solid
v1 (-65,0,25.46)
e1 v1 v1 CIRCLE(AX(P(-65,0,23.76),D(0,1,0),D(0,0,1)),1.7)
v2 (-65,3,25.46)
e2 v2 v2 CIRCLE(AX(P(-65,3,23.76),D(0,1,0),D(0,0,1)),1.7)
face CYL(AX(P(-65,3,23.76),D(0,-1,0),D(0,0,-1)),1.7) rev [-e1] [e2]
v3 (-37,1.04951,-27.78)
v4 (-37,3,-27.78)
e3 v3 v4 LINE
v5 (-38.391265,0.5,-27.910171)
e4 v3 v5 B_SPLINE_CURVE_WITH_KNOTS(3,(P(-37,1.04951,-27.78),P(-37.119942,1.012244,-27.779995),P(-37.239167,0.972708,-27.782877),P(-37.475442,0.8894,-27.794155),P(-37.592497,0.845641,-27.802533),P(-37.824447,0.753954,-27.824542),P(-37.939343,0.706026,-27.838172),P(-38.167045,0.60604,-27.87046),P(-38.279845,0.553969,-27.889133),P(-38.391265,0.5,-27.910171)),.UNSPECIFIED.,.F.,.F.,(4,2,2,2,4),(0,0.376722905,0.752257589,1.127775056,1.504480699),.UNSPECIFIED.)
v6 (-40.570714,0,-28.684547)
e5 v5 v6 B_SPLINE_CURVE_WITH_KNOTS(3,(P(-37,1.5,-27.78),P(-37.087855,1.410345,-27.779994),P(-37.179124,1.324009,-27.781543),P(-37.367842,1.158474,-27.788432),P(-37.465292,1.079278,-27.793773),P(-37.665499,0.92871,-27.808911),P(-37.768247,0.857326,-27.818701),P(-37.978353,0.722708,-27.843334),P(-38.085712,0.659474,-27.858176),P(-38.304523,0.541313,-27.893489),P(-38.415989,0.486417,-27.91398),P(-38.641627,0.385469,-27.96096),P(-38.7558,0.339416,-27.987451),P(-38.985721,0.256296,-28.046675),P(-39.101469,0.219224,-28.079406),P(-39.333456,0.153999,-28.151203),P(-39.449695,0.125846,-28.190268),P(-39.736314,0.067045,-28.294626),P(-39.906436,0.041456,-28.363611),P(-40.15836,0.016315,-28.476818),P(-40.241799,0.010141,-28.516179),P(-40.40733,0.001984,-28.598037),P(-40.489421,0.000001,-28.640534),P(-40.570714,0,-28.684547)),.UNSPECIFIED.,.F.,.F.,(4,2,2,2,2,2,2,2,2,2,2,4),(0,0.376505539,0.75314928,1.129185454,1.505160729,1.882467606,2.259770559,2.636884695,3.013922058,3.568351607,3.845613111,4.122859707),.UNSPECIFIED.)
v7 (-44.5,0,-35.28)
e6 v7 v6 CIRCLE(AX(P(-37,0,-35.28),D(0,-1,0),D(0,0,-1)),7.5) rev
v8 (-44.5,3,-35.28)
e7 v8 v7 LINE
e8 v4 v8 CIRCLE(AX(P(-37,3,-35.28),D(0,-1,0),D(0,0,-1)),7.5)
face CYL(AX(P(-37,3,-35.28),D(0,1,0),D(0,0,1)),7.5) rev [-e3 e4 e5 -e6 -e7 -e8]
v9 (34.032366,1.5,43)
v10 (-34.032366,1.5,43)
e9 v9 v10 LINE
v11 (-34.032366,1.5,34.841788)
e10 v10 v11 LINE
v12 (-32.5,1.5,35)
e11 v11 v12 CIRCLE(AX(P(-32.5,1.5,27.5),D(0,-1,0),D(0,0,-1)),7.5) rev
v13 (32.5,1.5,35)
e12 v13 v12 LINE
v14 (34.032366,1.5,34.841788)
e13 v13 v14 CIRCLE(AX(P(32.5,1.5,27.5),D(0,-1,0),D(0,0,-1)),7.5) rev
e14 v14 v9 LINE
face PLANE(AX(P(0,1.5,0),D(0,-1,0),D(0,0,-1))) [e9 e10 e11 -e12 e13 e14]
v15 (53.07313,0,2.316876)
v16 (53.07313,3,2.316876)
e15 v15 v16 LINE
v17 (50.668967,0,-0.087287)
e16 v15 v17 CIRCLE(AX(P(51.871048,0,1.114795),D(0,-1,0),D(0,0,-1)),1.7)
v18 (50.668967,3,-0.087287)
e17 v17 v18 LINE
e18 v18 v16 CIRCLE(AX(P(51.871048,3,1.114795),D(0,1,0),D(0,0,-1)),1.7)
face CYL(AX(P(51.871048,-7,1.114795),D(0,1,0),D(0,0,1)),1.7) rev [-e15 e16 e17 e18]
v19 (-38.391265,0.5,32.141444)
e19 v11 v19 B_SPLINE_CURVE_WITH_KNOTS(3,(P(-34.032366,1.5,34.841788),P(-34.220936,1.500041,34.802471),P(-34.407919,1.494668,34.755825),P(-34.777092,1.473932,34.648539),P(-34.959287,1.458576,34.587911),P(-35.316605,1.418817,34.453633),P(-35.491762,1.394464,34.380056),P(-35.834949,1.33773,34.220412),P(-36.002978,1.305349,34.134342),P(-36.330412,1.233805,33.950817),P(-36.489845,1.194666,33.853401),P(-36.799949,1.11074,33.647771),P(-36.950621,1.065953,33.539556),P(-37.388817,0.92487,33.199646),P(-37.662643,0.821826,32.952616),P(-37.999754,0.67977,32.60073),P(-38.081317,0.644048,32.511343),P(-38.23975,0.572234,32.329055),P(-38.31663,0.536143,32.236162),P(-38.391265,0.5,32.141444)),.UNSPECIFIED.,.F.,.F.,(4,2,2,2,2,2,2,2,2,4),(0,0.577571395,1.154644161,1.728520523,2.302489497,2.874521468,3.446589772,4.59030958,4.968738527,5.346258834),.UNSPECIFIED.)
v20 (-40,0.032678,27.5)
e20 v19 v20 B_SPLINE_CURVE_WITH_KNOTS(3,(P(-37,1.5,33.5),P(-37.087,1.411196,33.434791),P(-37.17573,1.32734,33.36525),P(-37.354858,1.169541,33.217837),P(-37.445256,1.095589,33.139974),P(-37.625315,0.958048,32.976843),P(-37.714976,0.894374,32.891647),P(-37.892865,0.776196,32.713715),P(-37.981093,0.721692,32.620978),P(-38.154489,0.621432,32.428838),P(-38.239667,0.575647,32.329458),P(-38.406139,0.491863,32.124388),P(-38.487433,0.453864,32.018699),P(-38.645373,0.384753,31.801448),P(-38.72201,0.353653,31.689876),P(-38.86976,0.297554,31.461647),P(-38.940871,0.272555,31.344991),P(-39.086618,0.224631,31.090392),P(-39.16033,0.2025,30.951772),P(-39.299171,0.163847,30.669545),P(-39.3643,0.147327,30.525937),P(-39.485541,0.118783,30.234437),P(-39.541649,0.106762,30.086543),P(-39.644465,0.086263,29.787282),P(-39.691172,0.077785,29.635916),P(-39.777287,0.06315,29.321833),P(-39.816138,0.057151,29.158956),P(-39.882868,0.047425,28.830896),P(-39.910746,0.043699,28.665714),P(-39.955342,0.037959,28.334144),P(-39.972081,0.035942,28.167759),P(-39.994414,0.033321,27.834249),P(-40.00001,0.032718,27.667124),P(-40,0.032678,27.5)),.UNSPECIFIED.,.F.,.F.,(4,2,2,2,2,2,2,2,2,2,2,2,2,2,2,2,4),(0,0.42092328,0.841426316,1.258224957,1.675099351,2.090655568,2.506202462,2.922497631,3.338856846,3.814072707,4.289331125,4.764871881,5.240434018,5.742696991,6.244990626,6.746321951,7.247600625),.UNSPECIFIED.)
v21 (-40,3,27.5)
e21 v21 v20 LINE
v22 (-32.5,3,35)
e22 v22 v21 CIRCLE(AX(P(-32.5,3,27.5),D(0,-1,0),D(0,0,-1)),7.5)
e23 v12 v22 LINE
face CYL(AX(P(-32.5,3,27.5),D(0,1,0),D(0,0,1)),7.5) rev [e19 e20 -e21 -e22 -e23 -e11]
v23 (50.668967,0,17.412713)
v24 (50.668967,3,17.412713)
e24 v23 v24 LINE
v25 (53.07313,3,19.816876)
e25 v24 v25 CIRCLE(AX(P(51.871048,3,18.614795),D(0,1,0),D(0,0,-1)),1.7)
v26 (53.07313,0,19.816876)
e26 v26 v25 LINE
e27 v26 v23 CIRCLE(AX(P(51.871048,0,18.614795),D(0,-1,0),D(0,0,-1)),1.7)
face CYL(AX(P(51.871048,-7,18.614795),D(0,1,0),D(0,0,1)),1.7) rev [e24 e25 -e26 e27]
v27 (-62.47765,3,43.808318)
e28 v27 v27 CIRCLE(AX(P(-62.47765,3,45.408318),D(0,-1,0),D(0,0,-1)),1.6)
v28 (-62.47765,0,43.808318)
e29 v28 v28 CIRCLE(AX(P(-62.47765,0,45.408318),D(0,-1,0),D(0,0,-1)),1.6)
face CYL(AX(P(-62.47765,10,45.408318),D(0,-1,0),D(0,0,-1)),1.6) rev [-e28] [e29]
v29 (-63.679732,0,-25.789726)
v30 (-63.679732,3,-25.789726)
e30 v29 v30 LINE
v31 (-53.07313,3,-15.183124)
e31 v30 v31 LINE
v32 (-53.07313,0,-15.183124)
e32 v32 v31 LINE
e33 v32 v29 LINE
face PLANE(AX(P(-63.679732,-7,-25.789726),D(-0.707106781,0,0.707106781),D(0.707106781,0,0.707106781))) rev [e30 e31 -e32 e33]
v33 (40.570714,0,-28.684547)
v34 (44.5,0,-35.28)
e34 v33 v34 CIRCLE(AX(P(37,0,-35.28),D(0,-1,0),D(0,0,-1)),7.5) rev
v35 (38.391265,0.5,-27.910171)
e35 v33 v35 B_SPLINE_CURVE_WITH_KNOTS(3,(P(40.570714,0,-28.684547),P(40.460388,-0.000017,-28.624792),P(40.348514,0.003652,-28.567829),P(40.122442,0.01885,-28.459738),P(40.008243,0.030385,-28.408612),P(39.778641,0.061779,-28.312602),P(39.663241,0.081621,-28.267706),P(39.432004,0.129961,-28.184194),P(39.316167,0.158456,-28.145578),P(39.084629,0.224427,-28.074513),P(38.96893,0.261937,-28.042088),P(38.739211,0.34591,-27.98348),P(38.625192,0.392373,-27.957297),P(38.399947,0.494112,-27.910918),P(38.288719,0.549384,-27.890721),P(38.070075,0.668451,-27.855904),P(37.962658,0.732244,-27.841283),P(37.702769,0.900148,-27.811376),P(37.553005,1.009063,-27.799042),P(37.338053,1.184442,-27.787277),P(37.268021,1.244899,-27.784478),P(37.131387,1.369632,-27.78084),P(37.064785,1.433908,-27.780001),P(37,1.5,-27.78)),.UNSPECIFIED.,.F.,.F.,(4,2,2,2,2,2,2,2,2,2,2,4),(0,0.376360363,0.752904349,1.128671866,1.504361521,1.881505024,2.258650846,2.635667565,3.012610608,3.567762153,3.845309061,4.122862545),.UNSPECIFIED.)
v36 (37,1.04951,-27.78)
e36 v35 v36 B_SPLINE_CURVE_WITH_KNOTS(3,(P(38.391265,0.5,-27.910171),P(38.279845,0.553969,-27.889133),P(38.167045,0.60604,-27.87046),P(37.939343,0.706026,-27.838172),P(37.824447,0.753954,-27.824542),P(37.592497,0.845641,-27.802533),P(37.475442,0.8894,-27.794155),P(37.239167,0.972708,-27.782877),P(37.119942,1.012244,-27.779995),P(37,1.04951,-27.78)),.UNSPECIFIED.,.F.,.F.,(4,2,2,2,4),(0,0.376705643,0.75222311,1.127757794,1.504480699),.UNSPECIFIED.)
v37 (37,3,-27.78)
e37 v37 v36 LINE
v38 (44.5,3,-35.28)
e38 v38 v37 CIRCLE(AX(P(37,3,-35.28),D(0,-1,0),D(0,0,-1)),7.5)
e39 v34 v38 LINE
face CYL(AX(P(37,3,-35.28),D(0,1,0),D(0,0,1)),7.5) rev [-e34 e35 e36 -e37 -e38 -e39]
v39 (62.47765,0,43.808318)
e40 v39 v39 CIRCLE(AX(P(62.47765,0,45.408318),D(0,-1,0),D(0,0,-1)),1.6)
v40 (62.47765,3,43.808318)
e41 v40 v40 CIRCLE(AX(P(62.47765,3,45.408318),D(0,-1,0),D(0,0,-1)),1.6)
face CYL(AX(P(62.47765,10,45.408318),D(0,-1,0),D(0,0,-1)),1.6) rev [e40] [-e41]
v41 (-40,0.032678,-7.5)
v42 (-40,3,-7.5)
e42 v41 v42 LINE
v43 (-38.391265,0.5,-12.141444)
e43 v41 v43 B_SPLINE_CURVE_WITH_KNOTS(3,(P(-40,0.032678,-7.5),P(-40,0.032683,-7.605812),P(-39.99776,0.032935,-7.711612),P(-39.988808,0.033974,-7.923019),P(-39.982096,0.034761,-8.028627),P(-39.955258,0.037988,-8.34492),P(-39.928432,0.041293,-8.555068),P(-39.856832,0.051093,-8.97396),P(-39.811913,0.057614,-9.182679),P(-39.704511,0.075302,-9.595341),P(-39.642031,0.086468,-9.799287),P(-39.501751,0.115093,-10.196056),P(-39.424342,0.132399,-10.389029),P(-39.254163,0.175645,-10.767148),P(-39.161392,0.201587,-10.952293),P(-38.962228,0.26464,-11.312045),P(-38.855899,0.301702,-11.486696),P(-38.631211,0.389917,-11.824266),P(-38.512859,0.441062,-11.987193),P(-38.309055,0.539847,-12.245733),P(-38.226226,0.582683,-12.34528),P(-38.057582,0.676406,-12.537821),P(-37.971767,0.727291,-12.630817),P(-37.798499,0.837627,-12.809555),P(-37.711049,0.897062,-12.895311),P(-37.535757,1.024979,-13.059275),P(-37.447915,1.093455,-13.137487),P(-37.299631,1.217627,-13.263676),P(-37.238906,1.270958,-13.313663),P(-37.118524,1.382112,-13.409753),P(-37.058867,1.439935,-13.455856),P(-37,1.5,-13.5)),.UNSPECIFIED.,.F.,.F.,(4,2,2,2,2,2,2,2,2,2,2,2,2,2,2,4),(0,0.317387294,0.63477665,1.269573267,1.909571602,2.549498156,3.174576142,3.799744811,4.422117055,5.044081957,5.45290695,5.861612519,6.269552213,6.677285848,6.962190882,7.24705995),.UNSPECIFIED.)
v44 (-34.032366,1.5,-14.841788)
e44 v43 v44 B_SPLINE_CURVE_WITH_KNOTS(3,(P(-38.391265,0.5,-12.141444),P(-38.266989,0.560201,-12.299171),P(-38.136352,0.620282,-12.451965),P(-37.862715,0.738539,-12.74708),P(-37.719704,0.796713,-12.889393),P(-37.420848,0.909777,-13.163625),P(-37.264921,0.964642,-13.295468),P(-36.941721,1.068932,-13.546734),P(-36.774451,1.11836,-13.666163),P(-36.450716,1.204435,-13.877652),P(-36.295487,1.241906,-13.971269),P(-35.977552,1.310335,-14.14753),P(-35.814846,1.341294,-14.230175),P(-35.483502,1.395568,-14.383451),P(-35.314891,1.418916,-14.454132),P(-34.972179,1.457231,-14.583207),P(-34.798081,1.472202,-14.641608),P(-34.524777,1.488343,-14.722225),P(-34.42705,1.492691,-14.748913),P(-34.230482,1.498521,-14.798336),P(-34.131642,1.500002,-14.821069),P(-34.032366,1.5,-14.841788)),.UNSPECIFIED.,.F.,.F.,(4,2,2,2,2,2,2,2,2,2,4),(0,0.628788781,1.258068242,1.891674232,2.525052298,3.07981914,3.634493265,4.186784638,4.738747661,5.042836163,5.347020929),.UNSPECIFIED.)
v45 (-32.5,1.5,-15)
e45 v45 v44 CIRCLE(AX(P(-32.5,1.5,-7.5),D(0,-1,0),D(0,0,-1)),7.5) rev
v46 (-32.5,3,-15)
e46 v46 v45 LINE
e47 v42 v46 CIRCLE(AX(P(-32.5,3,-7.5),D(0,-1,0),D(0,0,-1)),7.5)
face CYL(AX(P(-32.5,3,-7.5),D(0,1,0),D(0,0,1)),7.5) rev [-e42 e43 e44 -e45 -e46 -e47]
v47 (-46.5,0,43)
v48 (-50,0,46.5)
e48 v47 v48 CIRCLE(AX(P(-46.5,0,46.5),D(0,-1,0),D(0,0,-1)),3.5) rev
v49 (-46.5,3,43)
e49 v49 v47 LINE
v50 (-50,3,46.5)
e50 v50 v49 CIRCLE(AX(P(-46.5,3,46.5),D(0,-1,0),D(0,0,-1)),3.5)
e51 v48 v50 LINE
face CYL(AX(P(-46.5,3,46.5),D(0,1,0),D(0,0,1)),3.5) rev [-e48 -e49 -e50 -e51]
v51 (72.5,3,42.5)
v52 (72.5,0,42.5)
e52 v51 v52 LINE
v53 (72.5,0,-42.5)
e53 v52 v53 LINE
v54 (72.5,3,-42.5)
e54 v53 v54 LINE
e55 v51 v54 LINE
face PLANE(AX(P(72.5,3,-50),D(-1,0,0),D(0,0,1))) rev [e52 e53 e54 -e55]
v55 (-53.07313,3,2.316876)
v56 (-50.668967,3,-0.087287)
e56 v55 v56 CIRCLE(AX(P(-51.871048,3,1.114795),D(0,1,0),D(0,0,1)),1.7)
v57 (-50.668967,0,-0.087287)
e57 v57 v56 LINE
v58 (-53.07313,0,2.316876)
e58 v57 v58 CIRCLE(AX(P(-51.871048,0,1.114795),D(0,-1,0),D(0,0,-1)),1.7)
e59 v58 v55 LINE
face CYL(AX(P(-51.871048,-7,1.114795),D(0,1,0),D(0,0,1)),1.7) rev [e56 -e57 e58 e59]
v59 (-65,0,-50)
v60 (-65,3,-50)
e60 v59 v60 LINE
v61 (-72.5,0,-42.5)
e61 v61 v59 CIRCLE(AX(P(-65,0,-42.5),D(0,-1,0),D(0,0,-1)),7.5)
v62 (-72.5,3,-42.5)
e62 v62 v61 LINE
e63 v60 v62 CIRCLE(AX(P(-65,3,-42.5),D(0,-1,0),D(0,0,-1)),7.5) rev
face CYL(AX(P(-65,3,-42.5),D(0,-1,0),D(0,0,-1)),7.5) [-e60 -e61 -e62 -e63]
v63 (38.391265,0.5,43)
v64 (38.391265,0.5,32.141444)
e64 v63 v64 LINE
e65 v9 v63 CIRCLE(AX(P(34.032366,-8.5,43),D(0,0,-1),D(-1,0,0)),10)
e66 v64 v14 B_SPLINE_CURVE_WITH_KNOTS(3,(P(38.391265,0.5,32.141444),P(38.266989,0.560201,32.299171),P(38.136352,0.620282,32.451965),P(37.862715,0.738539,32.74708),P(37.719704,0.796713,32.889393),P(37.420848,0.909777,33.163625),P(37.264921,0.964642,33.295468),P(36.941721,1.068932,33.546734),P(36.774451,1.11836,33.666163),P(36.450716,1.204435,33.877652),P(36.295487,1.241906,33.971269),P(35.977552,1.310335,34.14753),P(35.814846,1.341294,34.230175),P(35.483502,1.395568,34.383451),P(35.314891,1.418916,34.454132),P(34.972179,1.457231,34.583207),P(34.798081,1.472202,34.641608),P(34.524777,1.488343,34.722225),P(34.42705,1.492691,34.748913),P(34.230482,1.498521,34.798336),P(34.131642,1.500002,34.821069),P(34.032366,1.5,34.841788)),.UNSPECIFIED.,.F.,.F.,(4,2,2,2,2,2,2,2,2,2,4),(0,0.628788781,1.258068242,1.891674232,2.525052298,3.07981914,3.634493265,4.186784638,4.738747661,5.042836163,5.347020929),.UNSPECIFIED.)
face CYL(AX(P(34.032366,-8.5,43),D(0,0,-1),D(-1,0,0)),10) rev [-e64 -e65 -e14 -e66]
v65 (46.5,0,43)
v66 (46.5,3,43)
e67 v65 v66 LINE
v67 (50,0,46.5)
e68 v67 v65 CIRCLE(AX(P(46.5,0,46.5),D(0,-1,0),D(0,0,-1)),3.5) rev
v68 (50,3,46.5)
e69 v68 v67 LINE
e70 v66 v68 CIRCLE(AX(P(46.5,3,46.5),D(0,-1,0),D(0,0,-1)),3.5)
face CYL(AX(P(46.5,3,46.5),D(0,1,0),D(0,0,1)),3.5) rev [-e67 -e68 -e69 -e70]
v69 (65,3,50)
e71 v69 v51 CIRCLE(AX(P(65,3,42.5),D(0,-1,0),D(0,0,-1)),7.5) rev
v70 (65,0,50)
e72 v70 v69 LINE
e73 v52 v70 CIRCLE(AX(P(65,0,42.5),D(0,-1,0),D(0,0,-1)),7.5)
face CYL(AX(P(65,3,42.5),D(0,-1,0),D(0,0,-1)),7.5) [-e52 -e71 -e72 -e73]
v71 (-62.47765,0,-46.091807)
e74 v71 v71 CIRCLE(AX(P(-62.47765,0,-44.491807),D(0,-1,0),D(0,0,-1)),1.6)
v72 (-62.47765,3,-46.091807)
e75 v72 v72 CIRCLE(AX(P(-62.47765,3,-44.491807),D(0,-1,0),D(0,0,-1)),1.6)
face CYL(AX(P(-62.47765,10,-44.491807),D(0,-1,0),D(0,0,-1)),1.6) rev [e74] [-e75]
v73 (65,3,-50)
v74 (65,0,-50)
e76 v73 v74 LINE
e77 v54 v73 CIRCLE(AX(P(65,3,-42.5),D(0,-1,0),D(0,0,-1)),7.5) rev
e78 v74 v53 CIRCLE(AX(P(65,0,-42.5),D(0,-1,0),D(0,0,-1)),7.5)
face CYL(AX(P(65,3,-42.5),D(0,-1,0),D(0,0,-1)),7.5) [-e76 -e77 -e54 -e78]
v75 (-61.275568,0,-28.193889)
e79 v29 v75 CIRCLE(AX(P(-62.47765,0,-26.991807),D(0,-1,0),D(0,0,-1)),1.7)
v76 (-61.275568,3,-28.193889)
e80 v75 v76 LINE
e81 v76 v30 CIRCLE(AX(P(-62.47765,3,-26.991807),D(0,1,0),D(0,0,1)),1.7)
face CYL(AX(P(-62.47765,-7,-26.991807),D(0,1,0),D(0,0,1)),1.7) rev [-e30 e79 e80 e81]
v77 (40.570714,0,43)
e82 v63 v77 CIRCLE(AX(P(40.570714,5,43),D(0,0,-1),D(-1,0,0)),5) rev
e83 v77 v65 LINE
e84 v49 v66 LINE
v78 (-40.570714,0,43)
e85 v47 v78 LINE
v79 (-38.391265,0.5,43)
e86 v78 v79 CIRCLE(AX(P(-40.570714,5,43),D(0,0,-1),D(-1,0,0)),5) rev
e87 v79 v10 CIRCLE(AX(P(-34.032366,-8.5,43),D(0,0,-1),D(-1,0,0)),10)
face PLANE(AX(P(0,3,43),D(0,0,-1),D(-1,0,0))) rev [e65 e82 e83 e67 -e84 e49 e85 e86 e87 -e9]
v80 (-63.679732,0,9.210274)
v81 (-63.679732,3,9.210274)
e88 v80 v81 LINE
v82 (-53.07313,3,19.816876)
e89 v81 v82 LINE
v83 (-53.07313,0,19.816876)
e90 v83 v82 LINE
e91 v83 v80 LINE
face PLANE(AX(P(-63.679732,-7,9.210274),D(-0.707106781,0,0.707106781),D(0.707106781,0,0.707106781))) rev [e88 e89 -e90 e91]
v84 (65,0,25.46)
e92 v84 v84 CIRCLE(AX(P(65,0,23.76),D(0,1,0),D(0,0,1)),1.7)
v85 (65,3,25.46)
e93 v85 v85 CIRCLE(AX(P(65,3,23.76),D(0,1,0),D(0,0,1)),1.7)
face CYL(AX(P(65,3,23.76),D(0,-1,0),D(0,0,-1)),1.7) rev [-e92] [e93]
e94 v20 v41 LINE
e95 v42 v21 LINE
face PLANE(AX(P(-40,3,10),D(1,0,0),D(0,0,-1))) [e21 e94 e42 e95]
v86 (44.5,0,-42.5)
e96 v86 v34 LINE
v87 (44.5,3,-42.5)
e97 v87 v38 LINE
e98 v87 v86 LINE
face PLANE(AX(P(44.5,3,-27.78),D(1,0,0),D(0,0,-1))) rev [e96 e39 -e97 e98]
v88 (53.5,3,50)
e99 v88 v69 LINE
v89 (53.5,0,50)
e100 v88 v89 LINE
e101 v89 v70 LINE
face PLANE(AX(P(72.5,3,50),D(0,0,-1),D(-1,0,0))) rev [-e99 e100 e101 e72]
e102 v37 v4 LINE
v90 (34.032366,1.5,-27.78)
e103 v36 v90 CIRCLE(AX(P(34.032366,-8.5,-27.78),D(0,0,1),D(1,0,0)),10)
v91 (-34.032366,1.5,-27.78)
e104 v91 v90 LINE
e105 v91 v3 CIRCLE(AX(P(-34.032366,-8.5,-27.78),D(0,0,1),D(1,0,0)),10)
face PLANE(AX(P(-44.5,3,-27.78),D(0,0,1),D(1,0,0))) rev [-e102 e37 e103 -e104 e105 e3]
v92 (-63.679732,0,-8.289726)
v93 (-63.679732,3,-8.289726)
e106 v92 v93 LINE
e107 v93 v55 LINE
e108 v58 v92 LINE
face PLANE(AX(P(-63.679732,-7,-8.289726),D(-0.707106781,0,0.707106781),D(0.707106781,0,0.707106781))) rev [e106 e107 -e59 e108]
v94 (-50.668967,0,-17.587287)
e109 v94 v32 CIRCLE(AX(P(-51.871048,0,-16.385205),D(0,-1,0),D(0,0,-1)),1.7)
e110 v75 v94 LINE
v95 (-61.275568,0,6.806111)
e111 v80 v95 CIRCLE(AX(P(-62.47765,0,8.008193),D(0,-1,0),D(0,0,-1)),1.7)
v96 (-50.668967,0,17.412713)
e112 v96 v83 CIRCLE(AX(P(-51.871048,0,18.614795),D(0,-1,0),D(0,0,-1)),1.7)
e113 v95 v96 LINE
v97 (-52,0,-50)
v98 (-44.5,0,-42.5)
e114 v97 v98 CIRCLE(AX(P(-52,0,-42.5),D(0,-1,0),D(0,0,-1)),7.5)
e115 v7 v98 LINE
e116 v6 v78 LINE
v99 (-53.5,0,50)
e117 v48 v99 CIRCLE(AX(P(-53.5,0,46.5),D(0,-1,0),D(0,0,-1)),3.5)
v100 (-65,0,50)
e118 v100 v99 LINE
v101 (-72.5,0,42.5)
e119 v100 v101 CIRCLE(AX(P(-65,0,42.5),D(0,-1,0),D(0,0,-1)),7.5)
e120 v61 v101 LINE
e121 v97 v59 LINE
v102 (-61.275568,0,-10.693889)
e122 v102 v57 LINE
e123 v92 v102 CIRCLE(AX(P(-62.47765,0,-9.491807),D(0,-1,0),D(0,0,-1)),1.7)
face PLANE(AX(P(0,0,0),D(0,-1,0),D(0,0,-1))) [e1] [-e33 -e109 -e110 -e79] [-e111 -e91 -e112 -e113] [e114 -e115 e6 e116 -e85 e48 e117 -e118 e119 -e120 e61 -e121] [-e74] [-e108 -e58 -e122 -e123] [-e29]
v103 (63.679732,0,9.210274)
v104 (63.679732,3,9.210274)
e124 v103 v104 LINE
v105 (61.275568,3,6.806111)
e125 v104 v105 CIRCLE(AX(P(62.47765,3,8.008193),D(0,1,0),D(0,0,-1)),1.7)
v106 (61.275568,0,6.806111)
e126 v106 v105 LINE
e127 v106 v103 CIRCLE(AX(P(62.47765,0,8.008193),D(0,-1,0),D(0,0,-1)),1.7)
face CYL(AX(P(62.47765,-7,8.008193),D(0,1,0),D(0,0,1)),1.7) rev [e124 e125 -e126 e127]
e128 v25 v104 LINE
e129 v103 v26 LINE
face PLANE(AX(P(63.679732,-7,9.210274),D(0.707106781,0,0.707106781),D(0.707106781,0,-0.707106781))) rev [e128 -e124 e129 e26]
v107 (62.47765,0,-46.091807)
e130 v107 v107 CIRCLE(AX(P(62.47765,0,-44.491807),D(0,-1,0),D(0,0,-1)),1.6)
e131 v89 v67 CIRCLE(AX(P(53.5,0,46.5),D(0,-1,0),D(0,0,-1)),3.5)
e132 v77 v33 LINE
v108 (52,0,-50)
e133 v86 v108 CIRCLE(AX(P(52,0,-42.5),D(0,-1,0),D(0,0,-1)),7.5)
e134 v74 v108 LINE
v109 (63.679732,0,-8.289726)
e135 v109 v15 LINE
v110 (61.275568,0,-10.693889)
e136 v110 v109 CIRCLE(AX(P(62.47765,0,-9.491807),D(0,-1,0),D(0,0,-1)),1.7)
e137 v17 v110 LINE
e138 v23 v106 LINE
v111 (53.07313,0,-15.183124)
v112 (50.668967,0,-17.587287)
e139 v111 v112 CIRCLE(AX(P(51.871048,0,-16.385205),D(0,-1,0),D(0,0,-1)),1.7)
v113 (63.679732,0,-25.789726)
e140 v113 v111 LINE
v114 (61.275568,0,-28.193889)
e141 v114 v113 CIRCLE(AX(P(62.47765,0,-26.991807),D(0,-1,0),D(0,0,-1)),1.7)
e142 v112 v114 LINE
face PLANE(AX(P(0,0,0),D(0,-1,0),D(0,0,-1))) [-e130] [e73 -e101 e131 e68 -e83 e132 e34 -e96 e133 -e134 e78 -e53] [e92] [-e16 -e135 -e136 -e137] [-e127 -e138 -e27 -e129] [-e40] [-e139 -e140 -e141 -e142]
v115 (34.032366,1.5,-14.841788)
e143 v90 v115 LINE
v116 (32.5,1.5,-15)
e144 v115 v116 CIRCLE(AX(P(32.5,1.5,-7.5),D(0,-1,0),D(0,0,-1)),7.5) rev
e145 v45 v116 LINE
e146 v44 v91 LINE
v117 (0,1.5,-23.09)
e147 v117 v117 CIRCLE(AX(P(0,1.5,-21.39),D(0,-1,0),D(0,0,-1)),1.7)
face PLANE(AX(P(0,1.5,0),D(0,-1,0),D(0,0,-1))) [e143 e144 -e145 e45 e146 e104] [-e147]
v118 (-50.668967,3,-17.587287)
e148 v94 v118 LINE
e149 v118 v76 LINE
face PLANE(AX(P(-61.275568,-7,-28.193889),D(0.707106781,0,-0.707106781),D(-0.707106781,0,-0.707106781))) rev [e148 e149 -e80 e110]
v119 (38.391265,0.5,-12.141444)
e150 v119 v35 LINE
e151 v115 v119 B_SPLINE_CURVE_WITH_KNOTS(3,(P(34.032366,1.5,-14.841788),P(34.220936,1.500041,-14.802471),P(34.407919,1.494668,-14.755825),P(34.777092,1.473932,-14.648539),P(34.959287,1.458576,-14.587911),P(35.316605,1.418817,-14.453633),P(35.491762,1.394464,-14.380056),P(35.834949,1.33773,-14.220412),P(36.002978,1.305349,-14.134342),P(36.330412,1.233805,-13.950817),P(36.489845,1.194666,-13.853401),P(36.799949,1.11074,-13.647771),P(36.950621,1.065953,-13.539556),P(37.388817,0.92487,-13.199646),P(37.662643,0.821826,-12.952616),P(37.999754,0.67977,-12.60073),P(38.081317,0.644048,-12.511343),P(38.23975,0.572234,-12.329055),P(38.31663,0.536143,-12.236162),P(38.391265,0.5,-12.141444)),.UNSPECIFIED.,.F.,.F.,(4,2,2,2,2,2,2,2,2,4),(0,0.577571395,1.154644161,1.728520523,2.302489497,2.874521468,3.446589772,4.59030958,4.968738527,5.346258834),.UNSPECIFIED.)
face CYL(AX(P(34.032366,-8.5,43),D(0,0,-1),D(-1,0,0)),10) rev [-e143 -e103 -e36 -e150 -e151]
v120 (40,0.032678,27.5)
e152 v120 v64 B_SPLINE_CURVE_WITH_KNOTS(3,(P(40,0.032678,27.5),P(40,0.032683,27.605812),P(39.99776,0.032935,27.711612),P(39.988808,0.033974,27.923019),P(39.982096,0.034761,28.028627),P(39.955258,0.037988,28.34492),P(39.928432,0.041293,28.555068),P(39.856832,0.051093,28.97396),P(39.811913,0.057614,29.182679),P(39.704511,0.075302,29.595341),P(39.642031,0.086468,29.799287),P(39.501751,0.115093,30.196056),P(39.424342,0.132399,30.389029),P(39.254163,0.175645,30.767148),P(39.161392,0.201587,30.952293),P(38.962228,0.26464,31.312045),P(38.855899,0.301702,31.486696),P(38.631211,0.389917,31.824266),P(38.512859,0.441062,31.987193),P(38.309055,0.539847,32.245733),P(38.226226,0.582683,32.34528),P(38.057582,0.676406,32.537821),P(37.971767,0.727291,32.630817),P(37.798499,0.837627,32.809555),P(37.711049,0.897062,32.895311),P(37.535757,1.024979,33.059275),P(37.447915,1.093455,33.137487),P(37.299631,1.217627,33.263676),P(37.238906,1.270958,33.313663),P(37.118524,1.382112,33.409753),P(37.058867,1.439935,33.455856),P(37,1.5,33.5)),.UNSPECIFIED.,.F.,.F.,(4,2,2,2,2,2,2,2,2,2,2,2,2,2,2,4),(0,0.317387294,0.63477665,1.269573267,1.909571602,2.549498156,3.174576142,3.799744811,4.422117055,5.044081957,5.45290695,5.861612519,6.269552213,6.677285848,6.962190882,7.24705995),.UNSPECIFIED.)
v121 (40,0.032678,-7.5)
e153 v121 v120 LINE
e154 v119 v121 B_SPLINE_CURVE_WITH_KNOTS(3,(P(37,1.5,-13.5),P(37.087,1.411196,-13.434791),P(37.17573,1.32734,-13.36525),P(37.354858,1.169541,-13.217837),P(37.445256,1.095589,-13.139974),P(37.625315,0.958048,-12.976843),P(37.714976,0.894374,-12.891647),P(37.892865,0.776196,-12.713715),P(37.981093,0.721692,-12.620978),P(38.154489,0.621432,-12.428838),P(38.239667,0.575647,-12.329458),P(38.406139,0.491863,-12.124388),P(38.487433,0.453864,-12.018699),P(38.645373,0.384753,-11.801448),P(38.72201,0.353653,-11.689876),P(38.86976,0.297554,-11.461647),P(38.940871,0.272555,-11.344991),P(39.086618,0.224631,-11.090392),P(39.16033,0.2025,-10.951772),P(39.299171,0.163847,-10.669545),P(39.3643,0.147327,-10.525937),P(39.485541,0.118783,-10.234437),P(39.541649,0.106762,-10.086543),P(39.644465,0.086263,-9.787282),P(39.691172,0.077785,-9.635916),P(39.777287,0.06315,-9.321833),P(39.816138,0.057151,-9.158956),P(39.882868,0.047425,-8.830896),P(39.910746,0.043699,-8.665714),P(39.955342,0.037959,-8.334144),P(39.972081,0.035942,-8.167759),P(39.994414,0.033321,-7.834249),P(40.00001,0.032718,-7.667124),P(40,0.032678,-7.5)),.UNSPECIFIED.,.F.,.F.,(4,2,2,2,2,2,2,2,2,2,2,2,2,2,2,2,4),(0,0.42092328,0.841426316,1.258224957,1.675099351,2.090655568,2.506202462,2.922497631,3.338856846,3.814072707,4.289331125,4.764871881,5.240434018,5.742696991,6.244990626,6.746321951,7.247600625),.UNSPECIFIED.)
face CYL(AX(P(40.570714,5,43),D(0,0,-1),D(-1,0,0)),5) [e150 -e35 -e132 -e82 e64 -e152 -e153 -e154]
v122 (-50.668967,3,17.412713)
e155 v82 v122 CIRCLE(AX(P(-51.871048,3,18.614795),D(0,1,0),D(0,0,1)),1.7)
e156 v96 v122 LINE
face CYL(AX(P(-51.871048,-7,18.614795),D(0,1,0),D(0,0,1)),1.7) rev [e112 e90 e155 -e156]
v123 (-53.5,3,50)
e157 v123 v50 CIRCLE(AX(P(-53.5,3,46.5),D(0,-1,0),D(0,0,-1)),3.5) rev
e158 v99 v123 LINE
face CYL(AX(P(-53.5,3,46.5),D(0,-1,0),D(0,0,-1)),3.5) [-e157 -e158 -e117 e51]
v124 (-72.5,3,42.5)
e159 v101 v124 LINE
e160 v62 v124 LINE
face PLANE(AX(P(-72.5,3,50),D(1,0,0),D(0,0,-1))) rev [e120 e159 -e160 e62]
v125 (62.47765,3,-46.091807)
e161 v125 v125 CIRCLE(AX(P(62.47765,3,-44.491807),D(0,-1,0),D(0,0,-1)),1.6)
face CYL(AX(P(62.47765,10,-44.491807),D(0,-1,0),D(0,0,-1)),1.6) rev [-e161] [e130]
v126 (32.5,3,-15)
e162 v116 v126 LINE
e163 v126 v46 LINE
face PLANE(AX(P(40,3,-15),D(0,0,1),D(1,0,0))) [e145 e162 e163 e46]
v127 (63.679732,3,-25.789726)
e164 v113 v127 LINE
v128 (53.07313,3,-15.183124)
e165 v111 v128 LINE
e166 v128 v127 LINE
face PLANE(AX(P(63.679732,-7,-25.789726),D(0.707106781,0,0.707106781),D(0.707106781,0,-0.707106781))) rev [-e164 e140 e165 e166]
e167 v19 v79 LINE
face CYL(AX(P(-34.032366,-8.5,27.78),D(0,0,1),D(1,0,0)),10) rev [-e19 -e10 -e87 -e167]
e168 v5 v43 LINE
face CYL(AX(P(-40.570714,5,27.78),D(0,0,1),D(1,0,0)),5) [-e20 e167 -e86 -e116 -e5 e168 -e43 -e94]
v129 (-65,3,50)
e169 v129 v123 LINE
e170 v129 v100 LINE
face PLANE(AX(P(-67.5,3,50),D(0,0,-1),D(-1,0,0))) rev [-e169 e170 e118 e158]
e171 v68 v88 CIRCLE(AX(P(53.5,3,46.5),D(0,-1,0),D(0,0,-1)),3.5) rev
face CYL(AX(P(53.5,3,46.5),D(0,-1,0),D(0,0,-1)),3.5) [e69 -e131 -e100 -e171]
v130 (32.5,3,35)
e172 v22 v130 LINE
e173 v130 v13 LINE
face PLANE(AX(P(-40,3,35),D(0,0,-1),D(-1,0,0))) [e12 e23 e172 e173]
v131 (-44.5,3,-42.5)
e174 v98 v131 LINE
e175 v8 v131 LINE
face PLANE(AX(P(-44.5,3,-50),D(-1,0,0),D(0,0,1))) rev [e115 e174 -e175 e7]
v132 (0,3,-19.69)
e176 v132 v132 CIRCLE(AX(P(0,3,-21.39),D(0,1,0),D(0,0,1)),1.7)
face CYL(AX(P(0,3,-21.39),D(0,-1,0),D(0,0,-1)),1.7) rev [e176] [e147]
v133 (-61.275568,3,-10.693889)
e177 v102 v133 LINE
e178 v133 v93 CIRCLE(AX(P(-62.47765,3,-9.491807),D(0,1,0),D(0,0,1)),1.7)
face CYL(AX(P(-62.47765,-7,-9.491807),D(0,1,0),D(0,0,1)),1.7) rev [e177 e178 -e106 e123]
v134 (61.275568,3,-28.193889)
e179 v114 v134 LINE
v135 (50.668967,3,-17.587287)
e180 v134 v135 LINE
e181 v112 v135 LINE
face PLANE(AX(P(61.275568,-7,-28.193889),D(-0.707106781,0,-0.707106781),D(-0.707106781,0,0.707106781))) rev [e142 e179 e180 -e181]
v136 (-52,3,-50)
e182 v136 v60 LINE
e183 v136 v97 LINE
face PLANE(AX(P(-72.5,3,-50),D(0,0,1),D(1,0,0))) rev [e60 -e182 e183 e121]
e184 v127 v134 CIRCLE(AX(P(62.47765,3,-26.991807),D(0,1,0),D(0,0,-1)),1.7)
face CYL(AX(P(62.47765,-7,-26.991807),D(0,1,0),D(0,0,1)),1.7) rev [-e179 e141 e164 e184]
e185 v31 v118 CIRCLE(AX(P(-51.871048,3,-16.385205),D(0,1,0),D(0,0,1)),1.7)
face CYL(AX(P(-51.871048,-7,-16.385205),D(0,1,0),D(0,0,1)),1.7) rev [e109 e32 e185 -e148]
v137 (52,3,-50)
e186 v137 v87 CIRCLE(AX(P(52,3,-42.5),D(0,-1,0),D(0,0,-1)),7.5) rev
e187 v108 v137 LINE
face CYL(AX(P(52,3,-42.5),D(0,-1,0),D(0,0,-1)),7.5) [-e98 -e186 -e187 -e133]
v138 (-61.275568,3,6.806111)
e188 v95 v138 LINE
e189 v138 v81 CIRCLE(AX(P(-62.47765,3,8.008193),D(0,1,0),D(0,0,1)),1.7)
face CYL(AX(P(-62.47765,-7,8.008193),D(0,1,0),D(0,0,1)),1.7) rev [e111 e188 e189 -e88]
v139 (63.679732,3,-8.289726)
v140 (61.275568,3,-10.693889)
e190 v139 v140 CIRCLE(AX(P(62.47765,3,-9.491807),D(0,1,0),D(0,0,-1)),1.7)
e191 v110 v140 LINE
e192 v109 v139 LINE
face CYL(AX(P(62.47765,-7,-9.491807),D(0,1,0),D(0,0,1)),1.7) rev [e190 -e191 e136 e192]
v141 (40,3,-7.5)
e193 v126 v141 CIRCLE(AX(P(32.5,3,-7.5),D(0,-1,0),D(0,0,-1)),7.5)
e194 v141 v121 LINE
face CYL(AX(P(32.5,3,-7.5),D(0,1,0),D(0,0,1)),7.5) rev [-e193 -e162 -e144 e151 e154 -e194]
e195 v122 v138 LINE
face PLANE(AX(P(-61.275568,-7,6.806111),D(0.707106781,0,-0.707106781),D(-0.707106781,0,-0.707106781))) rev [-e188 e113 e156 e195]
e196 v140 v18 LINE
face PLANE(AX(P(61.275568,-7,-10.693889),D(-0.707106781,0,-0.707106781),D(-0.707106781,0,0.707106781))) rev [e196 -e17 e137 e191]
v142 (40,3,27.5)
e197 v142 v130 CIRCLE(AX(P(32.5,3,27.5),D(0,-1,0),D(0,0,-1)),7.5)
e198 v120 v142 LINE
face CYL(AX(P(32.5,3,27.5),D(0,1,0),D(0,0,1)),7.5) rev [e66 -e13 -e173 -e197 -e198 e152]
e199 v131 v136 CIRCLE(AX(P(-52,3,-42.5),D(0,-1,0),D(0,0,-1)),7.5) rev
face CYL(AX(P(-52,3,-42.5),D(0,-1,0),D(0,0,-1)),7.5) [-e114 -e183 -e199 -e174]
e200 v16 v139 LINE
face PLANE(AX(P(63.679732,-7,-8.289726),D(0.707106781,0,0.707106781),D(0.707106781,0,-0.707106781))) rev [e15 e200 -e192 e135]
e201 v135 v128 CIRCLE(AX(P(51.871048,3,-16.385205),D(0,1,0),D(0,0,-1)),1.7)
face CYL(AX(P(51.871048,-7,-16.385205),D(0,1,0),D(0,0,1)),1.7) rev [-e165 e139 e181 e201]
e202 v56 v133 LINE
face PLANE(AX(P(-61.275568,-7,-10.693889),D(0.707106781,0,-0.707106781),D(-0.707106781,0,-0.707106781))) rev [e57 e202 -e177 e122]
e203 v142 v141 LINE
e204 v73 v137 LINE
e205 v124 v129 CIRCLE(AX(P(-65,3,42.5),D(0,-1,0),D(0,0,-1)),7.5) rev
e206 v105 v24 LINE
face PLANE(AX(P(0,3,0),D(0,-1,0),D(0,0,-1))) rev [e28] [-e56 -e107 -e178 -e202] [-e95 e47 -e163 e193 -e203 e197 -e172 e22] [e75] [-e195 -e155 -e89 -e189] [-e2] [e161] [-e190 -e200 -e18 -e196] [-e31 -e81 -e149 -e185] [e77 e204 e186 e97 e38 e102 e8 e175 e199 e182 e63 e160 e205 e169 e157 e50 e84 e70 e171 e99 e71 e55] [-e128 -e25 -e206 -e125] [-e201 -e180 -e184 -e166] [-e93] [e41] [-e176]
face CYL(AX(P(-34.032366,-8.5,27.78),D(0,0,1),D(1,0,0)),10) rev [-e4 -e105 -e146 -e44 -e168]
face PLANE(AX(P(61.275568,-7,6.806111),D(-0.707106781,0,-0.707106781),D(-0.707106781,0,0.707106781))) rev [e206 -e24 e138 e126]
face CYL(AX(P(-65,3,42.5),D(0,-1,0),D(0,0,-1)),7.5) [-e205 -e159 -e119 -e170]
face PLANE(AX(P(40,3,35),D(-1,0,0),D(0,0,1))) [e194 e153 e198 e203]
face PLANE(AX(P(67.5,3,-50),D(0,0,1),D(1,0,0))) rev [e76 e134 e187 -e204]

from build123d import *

# Parameters (mm, degrees)
SKETCH_1_R          = 1.7
EXTRUDE_1_DEPTH     = 3
FILLET_1_R          = 7.5
FILLET_2_R          = 3.5
CUT_EXTRUDE_5_DEPTH = 10
CUT_EXTRUDE_6_DEPTH = 10
CUT_EXTRUDE_7_DEPTH = 1.5
FILLET_START        = -35.28
FILLET_3_DEPTH      = 78.28
FILLET_4_R          = 10


with BuildPart() as part:
    # 草图1 → 凸台-拉伸1 (new body)
    with BuildSketch(Plane(origin=(0, 0, 0), x_dir=(1, 0, 0), z_dir=(0, 1, 0))):
        Polygon((-67.5, 50), (-44.5, 50), (-44.5, 27.78), (44.5, 27.78), (44.5, 50), (67.5, 50), (72.5, 50), (72.5, -50), (67.5, -50), (50, -50), (50, -43), (0, -43), (-50, -43), (-50, -50), (-67.5, -50), (-72.5, -50), (-72.5, 50), align=None)
        with Locations(Location((0, 21.39, 0), (0, 0, 270))):
            Circle(SKETCH_1_R, mode=Mode.SUBTRACT)
        with Locations(Location((65, -23.76, 0), (0, 0, 270))):
            Circle(SKETCH_1_R, mode=Mode.SUBTRACT)
        with Locations(Location((-65, -23.76, 0), (0, 0, 270))):
            Circle(SKETCH_1_R, mode=Mode.SUBTRACT)
        Polygon((-40, -10), (-40, -35), (40, -35), (40, 15), (-40, 15), align=None, mode=Mode.SUBTRACT)
    extrude(amount=EXTRUDE_1_DEPTH)

    # 圆角1
    fillet_1_edges = [part.edges().sort_by_distance(p)[0] for p in [
        (72.5, 1.5, -50),
        (72.5, 1.5, 50),
        (-72.5, 1.5, 50),
        (-72.5, 1.5, -50),
        (-44.5, 1.5, -50),
        (-44.5, 1.5, -27.78),
        (44.5, 1.5, -27.78),
        (44.5, 1.5, -50),
        (-40, 1.5, -15),
        (-40, 1.5, 35),
        (40, 1.5, 35),
        (40, 1.5, -15),
    ]]
    fillet(fillet_1_edges, radius=FILLET_1_R)

    # 圆角2
    fillet_2_edges = [part.edges().sort_by_distance(p)[0] for p in [
        (50, 1.5, 43),
        (-50, 1.5, 43),
    ]]
    fillet(fillet_2_edges, radius=FILLET_2_R)
    fillet_2_2_edges = [part.edges().sort_by_distance(p)[0] for p in [
        (50, 1.5, 50),
        (-50, 1.5, 50),
    ]]
    fillet(fillet_2_2_edges, radius=FILLET_2_R - 0.0001)  # a hair under: the kernel refuses the full size

    # 草图12 → 切除-拉伸5 (cut)
    with BuildSketch(Plane(origin=(0, 0, 0), x_dir=(-1, 0, 0), z_dir=(0, -1, 0))):
        with BuildLine():
            ThreePointArc((62.47765, -43.808317961), (61.34627915, -44.276947111), (60.87765, -45.408317961))
            Line((60.87765, -45.408317961), (62.47765, -45.408317961))
            Line((62.47765, -45.408317961), (62.47765, -43.808317961))
        make_face()
        with BuildLine():
            Line((62.47765, -45.408317961), (60.87765, -45.408317961))
            ThreePointArc((60.87765, -45.408317961), (62.47765, -47.008317961), (64.07765, -45.408317961))
            ThreePointArc((64.07765, -45.408317961), (63.60902085, -44.276947111), (62.47765, -43.808317961))
            Line((62.47765, -43.808317961), (62.47765, -45.408317961))
        make_face()
        with BuildLine():
            ThreePointArc((-62.47765, -43.808317961), (-63.60902085, -46.539688811), (-60.87765, -45.408317961))
            Line((-60.87765, -45.408317961), (-62.47765, -45.408317961))
            Line((-62.47765, -45.408317961), (-62.47765, -43.808317961))
        make_face()
        with BuildLine():
            Line((-62.47765, -45.408317961), (-60.87765, -45.408317961))
            ThreePointArc((-60.87765, -45.408317961), (-61.34627915, -44.276947111), (-62.47765, -43.808317961))
            Line((-62.47765, -43.808317961), (-62.47765, -45.408317961))
        make_face()
        with BuildLine():
            ThreePointArc((-62.47765, 42.891807039), (-61.34627915, 43.360436189), (-60.87765, 44.491807039))
            Line((-60.87765, 44.491807039), (-62.47765, 44.491807039))
            Line((-62.47765, 44.491807039), (-62.47765, 42.891807039))
        make_face()
        with BuildLine():
            Line((-62.47765, 44.491807039), (-60.87765, 44.491807039))
            ThreePointArc((-60.87765, 44.491807039), (-63.60902085, 45.623177889), (-62.47765, 42.891807039))
            Line((-62.47765, 42.891807039), (-62.47765, 44.491807039))
        make_face()
        with BuildLine():
            ThreePointArc((64.07765, 44.491807039), (62.47765, 46.091807039), (60.87765, 44.491807039))
            Line((60.87765, 44.491807039), (62.47765, 44.491807039))
            Line((62.47765, 44.491807039), (62.47765, 42.891807039))
            ThreePointArc((62.47765, 42.891807039), (63.60902085, 43.360436189), (64.07765, 44.491807039))
        make_face()
        with BuildLine():
            Line((62.47765, 44.491807039), (60.87765, 44.491807039))
            ThreePointArc((60.87765, 44.491807039), (61.34627915, 43.360436189), (62.47765, 42.891807039))
            Line((62.47765, 42.891807039), (62.47765, 44.491807039))
        make_face()
    extrude(amount=-CUT_EXTRUDE_5_DEPTH, mode=Mode.SUBTRACT)

    # 草图13 → 切除-拉伸6 (cut)
    with BuildSketch(Plane(origin=(0, 3, 0), x_dir=(1, 0, 0), z_dir=(0, 1, 0))):
        with BuildLine():
            Line((61.275568472, -6.806111433), (50.668966754, -17.412713151))
            ThreePointArc((50.668966754, -17.412713151), (50.668966754, -19.816876207), (53.07312981, -19.816876207))
            Line((53.07312981, -19.816876207), (63.679731528, -9.210274489))
            ThreePointArc((63.679731528, -9.210274489), (63.679731528, -6.806111433), (61.275568472, -6.806111433))
        make_face()
        with BuildLine():
            Line((-61.275568472, 28.193888567), (-50.668966754, 17.587286849))
            ThreePointArc((-50.668966754, 17.587286849), (-50.668966754, 15.183123793), (-53.07312981, 15.183123793))
            Line((-53.07312981, 15.183123793), (-63.679731528, 25.789725511))
            ThreePointArc((-63.679731528, 25.789725511), (-63.679731528, 28.193888567), (-61.275568472, 28.193888567))
        make_face()
        with BuildLine():
            Line((-63.679731528, 8.289725511), (-53.07312981, -2.316876207))
            ThreePointArc((-53.07312981, -2.316876207), (-50.668966754, -2.316876207), (-50.668966754, 0.087286849))
            Line((-50.668966754, 0.087286849), (-61.275568472, 10.693888567))
            ThreePointArc((-61.275568472, 10.693888567), (-63.679731528, 10.693888567), (-63.679731528, 8.289725511))
        make_face()
        with BuildLine():
            Line((-63.679731528, -9.210274489), (-53.07312981, -19.816876207))
            ThreePointArc((-53.07312981, -19.816876207), (-50.668966754, -19.816876207), (-50.668966754, -17.412713151))
            Line((-50.668966754, -17.412713151), (-61.275568472, -6.806111433))
            ThreePointArc((-61.275568472, -6.806111433), (-63.679731528, -6.806111433), (-63.679731528, -9.210274489))
        make_face()
        with BuildLine():
            Line((61.275568472, 10.693888567), (50.668966754, 0.087286849))
            ThreePointArc((50.668966754, 0.087286849), (50.668966754, -2.316876207), (53.07312981, -2.316876207))
            Line((53.07312981, -2.316876207), (63.679731528, 8.289725511))
            ThreePointArc((63.679731528, 8.289725511), (63.679731528, 10.693888567), (61.275568472, 10.693888567))
        make_face()
        with BuildLine():
            Line((61.275568472, 28.193888567), (50.668966754, 17.587286849))
            ThreePointArc((50.668966754, 17.587286849), (50.668966754, 15.183123793), (53.07312981, 15.183123793))
            Line((53.07312981, 15.183123793), (63.679731528, 25.789725511))
            ThreePointArc((63.679731528, 25.789725511), (63.679731528, 28.193888567), (61.275568472, 28.193888567))
        make_face()
    extrude(amount=-CUT_EXTRUDE_6_DEPTH, mode=Mode.SUBTRACT)

    # 草图14 → 切除-拉伸7 (cut)
    with BuildSketch(Plane.XZ):
        Polygon((-37, 27.78), (-37, 43), (37, 43), (37, 27.78), (37, -27.78), (-37, -27.78), align=None)
    extrude(amount=-CUT_EXTRUDE_7_DEPTH, mode=Mode.SUBTRACT)

    # 圆角3: read off the stored shape, not the designer's step
    # 圆角3 outline → 圆角3 (cut)
    with BuildSketch(Plane.XY.offset(FILLET_START)):
        with BuildLine():
            Line((-40.570714214, 0), (-37, 0))
            Line((-37, 0), (-37, 1.5))
            ThreePointArc((-37, 1.5), (-38.634222541, 0.390227771), (-40.570714214, 0))
        make_face()
        with BuildLine():
            ThreePointArc((40.570714214, 0), (38.634222541, 0.390227771), (37, 1.5))
            Line((37, 1.5), (37, 0))
            Line((37, 0), (40.570714214, 0))
        make_face()
    extrude(amount=FILLET_3_DEPTH, mode=Mode.SUBTRACT)

    # 圆角4
    fillet_4_edges = [part.edges().sort_by_distance(p)[0] for p in [
        (-37, 1.5, 38.25),
        (-37, 1.5, -20.64),
        (37, 1.5, 38.25),
        (37, 1.5, -20.64),
    ]]
    fillet(fillet_4_edges, radius=FILLET_4_R)


solid = part.part
